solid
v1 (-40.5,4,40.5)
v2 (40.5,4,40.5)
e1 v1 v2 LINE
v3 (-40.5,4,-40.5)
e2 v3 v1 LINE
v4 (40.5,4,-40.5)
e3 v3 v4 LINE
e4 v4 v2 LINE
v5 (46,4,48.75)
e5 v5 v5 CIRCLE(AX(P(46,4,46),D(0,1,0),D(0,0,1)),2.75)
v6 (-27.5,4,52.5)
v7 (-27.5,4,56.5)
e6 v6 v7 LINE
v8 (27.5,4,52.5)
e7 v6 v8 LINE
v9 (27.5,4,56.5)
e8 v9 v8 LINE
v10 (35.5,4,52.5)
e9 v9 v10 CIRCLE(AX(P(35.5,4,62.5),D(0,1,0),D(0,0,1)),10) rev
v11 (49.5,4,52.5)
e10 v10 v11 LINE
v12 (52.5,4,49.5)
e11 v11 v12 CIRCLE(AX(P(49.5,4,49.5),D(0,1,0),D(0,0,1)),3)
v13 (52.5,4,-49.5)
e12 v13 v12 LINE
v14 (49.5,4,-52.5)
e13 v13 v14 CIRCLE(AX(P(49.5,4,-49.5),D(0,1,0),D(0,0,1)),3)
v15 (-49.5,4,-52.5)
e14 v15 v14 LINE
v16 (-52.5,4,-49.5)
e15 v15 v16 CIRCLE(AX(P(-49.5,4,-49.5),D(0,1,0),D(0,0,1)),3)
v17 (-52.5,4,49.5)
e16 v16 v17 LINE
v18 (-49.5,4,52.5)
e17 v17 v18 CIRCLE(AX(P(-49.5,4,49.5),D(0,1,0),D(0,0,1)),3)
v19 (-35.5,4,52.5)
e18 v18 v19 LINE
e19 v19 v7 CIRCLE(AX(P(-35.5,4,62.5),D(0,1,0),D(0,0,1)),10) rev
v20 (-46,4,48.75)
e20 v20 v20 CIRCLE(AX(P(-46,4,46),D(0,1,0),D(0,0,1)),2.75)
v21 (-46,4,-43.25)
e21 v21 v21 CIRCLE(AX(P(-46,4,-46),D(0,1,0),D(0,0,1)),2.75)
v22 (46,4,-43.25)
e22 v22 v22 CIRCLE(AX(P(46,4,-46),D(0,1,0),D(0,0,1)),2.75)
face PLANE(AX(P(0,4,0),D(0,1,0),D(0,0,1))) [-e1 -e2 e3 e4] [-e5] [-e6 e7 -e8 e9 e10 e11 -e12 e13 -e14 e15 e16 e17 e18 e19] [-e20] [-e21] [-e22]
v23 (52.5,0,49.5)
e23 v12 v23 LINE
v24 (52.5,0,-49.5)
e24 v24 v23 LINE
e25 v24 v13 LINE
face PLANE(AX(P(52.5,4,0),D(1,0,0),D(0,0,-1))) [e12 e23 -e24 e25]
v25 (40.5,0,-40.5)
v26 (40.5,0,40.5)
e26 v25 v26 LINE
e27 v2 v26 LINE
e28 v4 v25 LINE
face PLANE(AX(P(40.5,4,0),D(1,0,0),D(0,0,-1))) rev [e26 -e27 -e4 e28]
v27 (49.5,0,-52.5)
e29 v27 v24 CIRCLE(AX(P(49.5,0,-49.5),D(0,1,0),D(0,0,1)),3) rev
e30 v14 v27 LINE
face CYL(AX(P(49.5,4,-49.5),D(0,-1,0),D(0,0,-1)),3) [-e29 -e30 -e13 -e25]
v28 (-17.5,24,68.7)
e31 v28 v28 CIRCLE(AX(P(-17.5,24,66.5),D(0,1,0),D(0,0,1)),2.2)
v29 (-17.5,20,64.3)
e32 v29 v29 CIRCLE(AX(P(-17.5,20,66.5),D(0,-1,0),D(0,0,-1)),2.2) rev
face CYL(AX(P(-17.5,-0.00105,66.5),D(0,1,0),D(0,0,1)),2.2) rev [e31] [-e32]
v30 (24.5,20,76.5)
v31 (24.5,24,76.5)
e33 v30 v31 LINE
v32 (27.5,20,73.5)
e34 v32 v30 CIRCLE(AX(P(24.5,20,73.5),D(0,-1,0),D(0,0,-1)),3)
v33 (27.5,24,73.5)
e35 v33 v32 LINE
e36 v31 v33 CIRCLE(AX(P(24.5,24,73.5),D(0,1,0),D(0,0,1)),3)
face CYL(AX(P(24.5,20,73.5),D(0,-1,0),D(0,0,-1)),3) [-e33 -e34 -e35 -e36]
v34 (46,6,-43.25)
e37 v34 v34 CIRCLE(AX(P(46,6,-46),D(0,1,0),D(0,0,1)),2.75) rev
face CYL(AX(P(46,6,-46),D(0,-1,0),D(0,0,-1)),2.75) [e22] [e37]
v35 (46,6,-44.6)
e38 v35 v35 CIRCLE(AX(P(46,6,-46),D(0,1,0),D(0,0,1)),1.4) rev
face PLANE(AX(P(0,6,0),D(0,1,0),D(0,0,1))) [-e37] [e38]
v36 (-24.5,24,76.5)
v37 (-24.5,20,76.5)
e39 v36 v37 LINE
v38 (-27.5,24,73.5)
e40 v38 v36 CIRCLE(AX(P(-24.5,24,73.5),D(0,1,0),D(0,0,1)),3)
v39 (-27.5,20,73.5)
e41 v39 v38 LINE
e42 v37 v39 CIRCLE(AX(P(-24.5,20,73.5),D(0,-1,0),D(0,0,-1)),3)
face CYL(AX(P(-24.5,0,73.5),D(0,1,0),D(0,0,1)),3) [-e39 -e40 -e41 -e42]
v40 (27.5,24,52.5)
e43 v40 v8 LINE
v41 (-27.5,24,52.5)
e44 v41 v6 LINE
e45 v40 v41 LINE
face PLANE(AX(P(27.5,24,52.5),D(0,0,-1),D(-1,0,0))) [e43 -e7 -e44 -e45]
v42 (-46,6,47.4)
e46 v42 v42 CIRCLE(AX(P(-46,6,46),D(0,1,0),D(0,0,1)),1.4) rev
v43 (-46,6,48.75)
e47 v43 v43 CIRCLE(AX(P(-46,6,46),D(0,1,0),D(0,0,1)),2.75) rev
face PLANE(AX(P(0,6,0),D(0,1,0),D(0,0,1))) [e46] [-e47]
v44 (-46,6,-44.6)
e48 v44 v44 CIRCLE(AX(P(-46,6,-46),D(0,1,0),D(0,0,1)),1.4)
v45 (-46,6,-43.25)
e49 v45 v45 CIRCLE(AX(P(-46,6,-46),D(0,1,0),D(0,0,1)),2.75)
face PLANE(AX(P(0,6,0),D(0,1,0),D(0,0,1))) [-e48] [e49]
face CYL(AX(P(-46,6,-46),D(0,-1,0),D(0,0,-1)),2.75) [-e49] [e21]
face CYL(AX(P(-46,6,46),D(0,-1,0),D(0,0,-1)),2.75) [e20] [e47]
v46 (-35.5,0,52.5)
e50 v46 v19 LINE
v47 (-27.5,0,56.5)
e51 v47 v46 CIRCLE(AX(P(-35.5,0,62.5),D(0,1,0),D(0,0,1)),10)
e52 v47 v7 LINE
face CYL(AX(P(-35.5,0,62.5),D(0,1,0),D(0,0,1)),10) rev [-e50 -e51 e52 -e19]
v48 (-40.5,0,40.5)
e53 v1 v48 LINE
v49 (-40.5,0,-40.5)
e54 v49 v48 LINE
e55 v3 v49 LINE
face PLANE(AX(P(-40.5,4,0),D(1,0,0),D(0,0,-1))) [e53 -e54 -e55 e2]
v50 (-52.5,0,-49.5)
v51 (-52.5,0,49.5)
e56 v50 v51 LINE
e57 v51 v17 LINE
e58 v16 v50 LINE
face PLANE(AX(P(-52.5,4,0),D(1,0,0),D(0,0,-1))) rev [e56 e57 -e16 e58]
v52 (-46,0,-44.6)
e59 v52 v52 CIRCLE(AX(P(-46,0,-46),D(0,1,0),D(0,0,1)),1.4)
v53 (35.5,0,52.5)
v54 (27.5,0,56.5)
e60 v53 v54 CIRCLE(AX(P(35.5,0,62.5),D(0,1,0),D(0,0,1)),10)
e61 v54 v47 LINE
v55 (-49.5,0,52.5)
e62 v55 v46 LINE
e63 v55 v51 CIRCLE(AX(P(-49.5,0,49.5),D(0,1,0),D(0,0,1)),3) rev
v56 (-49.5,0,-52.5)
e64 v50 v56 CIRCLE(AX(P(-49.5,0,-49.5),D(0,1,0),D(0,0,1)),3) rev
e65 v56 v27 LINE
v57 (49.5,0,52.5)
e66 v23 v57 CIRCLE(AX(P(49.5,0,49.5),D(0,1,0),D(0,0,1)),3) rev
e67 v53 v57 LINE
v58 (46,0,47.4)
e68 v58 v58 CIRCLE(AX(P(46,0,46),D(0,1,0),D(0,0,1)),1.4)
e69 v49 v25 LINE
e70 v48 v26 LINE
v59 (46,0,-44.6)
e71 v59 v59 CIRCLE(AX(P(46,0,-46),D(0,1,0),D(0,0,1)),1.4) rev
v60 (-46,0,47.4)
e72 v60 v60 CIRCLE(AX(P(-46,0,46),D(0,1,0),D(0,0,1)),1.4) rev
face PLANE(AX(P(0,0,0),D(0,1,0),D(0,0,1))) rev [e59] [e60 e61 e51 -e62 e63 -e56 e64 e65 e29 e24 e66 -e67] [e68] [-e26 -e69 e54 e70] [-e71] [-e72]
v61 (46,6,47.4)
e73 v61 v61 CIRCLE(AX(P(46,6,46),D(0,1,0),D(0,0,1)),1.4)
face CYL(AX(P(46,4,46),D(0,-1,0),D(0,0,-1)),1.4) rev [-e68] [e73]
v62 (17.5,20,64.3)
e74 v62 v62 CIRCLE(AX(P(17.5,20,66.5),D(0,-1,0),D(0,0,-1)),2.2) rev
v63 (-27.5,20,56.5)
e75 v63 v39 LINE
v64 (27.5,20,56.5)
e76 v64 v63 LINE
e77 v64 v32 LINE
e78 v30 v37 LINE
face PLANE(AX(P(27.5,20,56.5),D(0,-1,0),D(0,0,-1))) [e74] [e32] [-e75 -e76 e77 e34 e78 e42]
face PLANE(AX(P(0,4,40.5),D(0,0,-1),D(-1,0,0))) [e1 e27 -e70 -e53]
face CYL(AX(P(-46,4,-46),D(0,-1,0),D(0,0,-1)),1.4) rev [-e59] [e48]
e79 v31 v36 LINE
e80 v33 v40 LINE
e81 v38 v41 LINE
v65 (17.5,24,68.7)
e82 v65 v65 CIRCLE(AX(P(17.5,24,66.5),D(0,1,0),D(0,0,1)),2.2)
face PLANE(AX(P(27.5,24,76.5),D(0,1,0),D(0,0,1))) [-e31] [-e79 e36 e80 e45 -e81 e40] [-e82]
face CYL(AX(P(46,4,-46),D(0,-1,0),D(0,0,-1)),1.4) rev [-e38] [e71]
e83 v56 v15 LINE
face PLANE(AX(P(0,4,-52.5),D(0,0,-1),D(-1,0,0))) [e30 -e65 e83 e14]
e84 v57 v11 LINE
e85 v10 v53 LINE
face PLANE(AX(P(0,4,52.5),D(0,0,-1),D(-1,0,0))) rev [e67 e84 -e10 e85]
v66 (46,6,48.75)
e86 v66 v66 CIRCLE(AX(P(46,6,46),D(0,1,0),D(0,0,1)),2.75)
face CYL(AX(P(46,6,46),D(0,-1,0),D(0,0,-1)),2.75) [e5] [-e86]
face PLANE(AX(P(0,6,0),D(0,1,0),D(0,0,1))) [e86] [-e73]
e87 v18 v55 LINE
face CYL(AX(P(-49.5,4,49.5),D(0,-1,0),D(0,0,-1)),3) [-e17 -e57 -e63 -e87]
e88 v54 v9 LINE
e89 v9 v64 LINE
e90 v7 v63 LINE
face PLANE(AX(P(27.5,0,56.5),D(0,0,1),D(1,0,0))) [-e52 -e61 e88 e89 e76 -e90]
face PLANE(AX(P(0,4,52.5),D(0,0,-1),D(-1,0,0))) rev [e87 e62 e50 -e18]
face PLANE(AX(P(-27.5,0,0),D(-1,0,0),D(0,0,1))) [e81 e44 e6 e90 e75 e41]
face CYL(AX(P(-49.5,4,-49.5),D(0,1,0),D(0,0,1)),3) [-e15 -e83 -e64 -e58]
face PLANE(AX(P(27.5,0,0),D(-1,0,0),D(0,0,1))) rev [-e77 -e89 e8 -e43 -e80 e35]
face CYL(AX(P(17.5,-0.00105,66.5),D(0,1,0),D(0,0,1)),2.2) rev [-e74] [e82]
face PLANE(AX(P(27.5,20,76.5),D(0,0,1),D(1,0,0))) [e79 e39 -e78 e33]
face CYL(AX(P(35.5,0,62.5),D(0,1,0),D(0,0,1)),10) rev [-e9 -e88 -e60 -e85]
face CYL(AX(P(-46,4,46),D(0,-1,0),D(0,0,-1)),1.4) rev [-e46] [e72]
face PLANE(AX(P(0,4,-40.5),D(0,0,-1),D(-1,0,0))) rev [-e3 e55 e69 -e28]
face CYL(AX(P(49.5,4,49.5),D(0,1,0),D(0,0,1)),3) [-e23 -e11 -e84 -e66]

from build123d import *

# Parameters (mm, degrees)
SKETCH_1_W          = 105
SKETCH_1_H          = 105
SKETCH_1_R          = 2.75
SKETCH_1_W_2        = 81
SKETCH_1_H_2        = 81
SKETCH_1_R_2        = 1.4
EXTRUDE_1_DEPTH     = 4
EXTRUDE_START       = 4
SKETCH_1_4_R        = 2.75
SKETCH_1_4_R_2      = 1.4
EXTRUDE_2_DEPTH     = 2
EXTRUDE_START_2     = -25
EXTRUDE_3_DEPTH     = 55
CUT_EXTRUDE_1_REACH = 97.836
SKETCH_3_R          = 2.2
FILLET_1_R          = 3
FILLET_2_R          = 10


with BuildPart() as part:
    # 草图1 → 凸台-拉伸1 (new body)
    # profile 1 of 5: a face of its own
    with BuildSketch(Plane(origin=(0, 0, 0), x_dir=(1, 0, 0), z_dir=(0, 1, 0))):
        Rectangle(SKETCH_1_W, SKETCH_1_H)
        with Locations((46, 46)):
            Circle(SKETCH_1_R, mode=Mode.SUBTRACT)
        with Locations((-46, 46)):
            Circle(SKETCH_1_R, mode=Mode.SUBTRACT)
        with Locations((46, -46)):
            Circle(SKETCH_1_R, mode=Mode.SUBTRACT)
        with Locations((-46, -46)):
            Circle(SKETCH_1_R, mode=Mode.SUBTRACT)
        Rectangle(SKETCH_1_W_2, SKETCH_1_H_2, mode=Mode.SUBTRACT)
    # profile 2 of 5: a face of its own
    with BuildSketch(Plane(origin=(0, 0, 0), x_dir=(1, 0, 0), z_dir=(0, 1, 0))):
        with Locations((46, 46)):
            Circle(SKETCH_1_R)
        with Locations(Location((46, 46, 0), (0, 0, 270))):
            Circle(SKETCH_1_R_2, mode=Mode.SUBTRACT)
    # profile 3 of 5: a face of its own
    with BuildSketch(Plane(origin=(0, 0, 0), x_dir=(1, 0, 0), z_dir=(0, 1, 0))):
        with Locations((-46, 46)):
            Circle(SKETCH_1_R)
        with Locations(Location((-46, 46, 0), (0, 0, 270))):
            Circle(SKETCH_1_R_2, mode=Mode.SUBTRACT)
    # profile 4 of 5: a face of its own
    with BuildSketch(Plane(origin=(0, 0, 0), x_dir=(1, 0, 0), z_dir=(0, 1, 0))):
        with Locations((-46, -46)):
            Circle(SKETCH_1_R)
        with Locations(Location((-46, -46, 0), (0, 0, 270))):
            Circle(SKETCH_1_R_2, mode=Mode.SUBTRACT)
    # profile 5 of 5: a face of its own
    with BuildSketch(Plane(origin=(0, 0, 0), x_dir=(1, 0, 0), z_dir=(0, 1, 0))):
        with Locations((46, -46)):
            Circle(SKETCH_1_R)
        with Locations(Location((46, -46, 0), (0, 0, 270))):
            Circle(SKETCH_1_R_2, mode=Mode.SUBTRACT)
    extrude(amount=EXTRUDE_1_DEPTH)

    # 草图1<4> → 凸台-拉伸2 (add)
    # profile 1 of 4: a face of its own
    with BuildSketch(Plane(origin=(0, 0, 0), x_dir=(1, 0, 0), z_dir=(0, 1, 0)).offset(EXTRUDE_START)):
        with Locations(Location((-46, 46, 0), (0, 0, 270))):
            Circle(SKETCH_1_4_R)
        with Locations(Location((-46, 46, 0), (0, 0, 270))):
            Circle(SKETCH_1_4_R_2, mode=Mode.SUBTRACT)
    # profile 2 of 4: a face of its own
    with BuildSketch(Plane(origin=(0, 0, 0), x_dir=(1, 0, 0), z_dir=(0, 1, 0)).offset(EXTRUDE_START)):
        with Locations(Location((46, 46, 0), (0, 0, 270))):
            Circle(SKETCH_1_4_R)
        with Locations(Location((46, 46, 0), (0, 0, 270))):
            Circle(SKETCH_1_4_R_2, mode=Mode.SUBTRACT)
    # profile 3 of 4: a face of its own
    with BuildSketch(Plane(origin=(0, 0, 0), x_dir=(1, 0, 0), z_dir=(0, 1, 0)).offset(EXTRUDE_START)):
        with Locations(Location((46, -46, 0), (0, 0, 270))):
            Circle(SKETCH_1_4_R)
        with Locations(Location((46, -46, 0), (0, 0, 270))):
            Circle(SKETCH_1_4_R_2, mode=Mode.SUBTRACT)
    # profile 4 of 4: a face of its own
    with BuildSketch(Plane(origin=(0, 0, 0), x_dir=(1, 0, 0), z_dir=(0, 1, 0)).offset(EXTRUDE_START)):
        with Locations(Location((-46, -46, 0), (0, 0, 270))):
            Circle(SKETCH_1_4_R)
        with Locations(Location((-46, -46, 0), (0, 0, 270))):
            Circle(SKETCH_1_4_R_2, mode=Mode.SUBTRACT)
    extrude(amount=EXTRUDE_2_DEPTH)

    # 草图2 → 凸台-拉伸3 (add)
    with BuildSketch(Plane.ZY.offset(52.5).offset(EXTRUDE_START_2)):
        Polygon((52.5, 0), (56.5, 0), (56.5, 20), (76.5, 20), (76.5, 24), (52.5, 24), align=None)
    extrude(amount=-EXTRUDE_3_DEPTH)

    # 草图3 → 切除-拉伸1 (cut, up to next)
    with BuildSketch(Plane(origin=(0, 24, 0), x_dir=(1, 0, 0), z_dir=(0, 1, 0)), mode=Mode.PRIVATE) as cut_extrude_1_sk1:
        with Locations(Location((17.5, -66.5, 0), (0, 0, 270))):
            Circle(SKETCH_3_R)
    cut_extrude_1_tool1 = extrude(cut_extrude_1_sk1.sketch, amount=-CUT_EXTRUDE_1_REACH, mode=Mode.PRIVATE) & part.part
    # 草图3 → 切除-拉伸1 (cut, up to next)
    with BuildSketch(Plane(origin=(0, 24, 0), x_dir=(1, 0, 0), z_dir=(0, 1, 0)), mode=Mode.PRIVATE) as cut_extrude_1_sk2:
        with Locations(Location((-17.5, -66.5, 0), (0, 0, 270))):
            Circle(SKETCH_3_R)
    cut_extrude_1_tool2 = extrude(cut_extrude_1_sk2.sketch, amount=-CUT_EXTRUDE_1_REACH, mode=Mode.PRIVATE) & part.part
    add(cut_extrude_1_tool1.solids().sort_by_distance((17.5, 24, 66.5))[0], mode=Mode.SUBTRACT)
    add(cut_extrude_1_tool2.solids().sort_by_distance((-17.5, 24, 66.5))[0], mode=Mode.SUBTRACT)

    # 圆角1
    fillet_1_edges = [part.edges().sort_by_distance(p)[0] for p in [
        (-52.5, 2, -52.5),
        (52.5, 2, -52.5),
        (52.5, 2, 52.5),
        (27.5, 22, 76.5),
        (-27.5, 22, 76.5),
        (-52.5, 2, 52.5),
    ]]
    fillet(fillet_1_edges, radius=FILLET_1_R)

    # 圆角2
    # the kernel refuses this fillet: 10 mm, written as the material it adds along each edge
    with BuildSketch(Plane(origin=(27.5, 4, 52.5), x_dir=(1, 0, 0), z_dir=(0, -1, 0))) as fillet_2_piece_1:
        with BuildLine():
            CenterArc((8, 10), FILLET_2_R, 216.869897646, 53.130102354)
            Line((0, 4), (0, 0))
            Line((0, 0), (8, 0))
        make_face()
    extrude(amount=4)
    with BuildSketch(Plane(origin=(-27.5, 4, 52.5), x_dir=(0, 0, 1), z_dir=(0, -1, 0))) as fillet_2_piece_2:
        with BuildLine():
            CenterArc((10, 8), FILLET_2_R, 180, 53.130102354)
            Line((0, 8), (0, 0))
            Line((0, 0), (4, 0))
        make_face()
    extrude(amount=4)


solid = part.part
